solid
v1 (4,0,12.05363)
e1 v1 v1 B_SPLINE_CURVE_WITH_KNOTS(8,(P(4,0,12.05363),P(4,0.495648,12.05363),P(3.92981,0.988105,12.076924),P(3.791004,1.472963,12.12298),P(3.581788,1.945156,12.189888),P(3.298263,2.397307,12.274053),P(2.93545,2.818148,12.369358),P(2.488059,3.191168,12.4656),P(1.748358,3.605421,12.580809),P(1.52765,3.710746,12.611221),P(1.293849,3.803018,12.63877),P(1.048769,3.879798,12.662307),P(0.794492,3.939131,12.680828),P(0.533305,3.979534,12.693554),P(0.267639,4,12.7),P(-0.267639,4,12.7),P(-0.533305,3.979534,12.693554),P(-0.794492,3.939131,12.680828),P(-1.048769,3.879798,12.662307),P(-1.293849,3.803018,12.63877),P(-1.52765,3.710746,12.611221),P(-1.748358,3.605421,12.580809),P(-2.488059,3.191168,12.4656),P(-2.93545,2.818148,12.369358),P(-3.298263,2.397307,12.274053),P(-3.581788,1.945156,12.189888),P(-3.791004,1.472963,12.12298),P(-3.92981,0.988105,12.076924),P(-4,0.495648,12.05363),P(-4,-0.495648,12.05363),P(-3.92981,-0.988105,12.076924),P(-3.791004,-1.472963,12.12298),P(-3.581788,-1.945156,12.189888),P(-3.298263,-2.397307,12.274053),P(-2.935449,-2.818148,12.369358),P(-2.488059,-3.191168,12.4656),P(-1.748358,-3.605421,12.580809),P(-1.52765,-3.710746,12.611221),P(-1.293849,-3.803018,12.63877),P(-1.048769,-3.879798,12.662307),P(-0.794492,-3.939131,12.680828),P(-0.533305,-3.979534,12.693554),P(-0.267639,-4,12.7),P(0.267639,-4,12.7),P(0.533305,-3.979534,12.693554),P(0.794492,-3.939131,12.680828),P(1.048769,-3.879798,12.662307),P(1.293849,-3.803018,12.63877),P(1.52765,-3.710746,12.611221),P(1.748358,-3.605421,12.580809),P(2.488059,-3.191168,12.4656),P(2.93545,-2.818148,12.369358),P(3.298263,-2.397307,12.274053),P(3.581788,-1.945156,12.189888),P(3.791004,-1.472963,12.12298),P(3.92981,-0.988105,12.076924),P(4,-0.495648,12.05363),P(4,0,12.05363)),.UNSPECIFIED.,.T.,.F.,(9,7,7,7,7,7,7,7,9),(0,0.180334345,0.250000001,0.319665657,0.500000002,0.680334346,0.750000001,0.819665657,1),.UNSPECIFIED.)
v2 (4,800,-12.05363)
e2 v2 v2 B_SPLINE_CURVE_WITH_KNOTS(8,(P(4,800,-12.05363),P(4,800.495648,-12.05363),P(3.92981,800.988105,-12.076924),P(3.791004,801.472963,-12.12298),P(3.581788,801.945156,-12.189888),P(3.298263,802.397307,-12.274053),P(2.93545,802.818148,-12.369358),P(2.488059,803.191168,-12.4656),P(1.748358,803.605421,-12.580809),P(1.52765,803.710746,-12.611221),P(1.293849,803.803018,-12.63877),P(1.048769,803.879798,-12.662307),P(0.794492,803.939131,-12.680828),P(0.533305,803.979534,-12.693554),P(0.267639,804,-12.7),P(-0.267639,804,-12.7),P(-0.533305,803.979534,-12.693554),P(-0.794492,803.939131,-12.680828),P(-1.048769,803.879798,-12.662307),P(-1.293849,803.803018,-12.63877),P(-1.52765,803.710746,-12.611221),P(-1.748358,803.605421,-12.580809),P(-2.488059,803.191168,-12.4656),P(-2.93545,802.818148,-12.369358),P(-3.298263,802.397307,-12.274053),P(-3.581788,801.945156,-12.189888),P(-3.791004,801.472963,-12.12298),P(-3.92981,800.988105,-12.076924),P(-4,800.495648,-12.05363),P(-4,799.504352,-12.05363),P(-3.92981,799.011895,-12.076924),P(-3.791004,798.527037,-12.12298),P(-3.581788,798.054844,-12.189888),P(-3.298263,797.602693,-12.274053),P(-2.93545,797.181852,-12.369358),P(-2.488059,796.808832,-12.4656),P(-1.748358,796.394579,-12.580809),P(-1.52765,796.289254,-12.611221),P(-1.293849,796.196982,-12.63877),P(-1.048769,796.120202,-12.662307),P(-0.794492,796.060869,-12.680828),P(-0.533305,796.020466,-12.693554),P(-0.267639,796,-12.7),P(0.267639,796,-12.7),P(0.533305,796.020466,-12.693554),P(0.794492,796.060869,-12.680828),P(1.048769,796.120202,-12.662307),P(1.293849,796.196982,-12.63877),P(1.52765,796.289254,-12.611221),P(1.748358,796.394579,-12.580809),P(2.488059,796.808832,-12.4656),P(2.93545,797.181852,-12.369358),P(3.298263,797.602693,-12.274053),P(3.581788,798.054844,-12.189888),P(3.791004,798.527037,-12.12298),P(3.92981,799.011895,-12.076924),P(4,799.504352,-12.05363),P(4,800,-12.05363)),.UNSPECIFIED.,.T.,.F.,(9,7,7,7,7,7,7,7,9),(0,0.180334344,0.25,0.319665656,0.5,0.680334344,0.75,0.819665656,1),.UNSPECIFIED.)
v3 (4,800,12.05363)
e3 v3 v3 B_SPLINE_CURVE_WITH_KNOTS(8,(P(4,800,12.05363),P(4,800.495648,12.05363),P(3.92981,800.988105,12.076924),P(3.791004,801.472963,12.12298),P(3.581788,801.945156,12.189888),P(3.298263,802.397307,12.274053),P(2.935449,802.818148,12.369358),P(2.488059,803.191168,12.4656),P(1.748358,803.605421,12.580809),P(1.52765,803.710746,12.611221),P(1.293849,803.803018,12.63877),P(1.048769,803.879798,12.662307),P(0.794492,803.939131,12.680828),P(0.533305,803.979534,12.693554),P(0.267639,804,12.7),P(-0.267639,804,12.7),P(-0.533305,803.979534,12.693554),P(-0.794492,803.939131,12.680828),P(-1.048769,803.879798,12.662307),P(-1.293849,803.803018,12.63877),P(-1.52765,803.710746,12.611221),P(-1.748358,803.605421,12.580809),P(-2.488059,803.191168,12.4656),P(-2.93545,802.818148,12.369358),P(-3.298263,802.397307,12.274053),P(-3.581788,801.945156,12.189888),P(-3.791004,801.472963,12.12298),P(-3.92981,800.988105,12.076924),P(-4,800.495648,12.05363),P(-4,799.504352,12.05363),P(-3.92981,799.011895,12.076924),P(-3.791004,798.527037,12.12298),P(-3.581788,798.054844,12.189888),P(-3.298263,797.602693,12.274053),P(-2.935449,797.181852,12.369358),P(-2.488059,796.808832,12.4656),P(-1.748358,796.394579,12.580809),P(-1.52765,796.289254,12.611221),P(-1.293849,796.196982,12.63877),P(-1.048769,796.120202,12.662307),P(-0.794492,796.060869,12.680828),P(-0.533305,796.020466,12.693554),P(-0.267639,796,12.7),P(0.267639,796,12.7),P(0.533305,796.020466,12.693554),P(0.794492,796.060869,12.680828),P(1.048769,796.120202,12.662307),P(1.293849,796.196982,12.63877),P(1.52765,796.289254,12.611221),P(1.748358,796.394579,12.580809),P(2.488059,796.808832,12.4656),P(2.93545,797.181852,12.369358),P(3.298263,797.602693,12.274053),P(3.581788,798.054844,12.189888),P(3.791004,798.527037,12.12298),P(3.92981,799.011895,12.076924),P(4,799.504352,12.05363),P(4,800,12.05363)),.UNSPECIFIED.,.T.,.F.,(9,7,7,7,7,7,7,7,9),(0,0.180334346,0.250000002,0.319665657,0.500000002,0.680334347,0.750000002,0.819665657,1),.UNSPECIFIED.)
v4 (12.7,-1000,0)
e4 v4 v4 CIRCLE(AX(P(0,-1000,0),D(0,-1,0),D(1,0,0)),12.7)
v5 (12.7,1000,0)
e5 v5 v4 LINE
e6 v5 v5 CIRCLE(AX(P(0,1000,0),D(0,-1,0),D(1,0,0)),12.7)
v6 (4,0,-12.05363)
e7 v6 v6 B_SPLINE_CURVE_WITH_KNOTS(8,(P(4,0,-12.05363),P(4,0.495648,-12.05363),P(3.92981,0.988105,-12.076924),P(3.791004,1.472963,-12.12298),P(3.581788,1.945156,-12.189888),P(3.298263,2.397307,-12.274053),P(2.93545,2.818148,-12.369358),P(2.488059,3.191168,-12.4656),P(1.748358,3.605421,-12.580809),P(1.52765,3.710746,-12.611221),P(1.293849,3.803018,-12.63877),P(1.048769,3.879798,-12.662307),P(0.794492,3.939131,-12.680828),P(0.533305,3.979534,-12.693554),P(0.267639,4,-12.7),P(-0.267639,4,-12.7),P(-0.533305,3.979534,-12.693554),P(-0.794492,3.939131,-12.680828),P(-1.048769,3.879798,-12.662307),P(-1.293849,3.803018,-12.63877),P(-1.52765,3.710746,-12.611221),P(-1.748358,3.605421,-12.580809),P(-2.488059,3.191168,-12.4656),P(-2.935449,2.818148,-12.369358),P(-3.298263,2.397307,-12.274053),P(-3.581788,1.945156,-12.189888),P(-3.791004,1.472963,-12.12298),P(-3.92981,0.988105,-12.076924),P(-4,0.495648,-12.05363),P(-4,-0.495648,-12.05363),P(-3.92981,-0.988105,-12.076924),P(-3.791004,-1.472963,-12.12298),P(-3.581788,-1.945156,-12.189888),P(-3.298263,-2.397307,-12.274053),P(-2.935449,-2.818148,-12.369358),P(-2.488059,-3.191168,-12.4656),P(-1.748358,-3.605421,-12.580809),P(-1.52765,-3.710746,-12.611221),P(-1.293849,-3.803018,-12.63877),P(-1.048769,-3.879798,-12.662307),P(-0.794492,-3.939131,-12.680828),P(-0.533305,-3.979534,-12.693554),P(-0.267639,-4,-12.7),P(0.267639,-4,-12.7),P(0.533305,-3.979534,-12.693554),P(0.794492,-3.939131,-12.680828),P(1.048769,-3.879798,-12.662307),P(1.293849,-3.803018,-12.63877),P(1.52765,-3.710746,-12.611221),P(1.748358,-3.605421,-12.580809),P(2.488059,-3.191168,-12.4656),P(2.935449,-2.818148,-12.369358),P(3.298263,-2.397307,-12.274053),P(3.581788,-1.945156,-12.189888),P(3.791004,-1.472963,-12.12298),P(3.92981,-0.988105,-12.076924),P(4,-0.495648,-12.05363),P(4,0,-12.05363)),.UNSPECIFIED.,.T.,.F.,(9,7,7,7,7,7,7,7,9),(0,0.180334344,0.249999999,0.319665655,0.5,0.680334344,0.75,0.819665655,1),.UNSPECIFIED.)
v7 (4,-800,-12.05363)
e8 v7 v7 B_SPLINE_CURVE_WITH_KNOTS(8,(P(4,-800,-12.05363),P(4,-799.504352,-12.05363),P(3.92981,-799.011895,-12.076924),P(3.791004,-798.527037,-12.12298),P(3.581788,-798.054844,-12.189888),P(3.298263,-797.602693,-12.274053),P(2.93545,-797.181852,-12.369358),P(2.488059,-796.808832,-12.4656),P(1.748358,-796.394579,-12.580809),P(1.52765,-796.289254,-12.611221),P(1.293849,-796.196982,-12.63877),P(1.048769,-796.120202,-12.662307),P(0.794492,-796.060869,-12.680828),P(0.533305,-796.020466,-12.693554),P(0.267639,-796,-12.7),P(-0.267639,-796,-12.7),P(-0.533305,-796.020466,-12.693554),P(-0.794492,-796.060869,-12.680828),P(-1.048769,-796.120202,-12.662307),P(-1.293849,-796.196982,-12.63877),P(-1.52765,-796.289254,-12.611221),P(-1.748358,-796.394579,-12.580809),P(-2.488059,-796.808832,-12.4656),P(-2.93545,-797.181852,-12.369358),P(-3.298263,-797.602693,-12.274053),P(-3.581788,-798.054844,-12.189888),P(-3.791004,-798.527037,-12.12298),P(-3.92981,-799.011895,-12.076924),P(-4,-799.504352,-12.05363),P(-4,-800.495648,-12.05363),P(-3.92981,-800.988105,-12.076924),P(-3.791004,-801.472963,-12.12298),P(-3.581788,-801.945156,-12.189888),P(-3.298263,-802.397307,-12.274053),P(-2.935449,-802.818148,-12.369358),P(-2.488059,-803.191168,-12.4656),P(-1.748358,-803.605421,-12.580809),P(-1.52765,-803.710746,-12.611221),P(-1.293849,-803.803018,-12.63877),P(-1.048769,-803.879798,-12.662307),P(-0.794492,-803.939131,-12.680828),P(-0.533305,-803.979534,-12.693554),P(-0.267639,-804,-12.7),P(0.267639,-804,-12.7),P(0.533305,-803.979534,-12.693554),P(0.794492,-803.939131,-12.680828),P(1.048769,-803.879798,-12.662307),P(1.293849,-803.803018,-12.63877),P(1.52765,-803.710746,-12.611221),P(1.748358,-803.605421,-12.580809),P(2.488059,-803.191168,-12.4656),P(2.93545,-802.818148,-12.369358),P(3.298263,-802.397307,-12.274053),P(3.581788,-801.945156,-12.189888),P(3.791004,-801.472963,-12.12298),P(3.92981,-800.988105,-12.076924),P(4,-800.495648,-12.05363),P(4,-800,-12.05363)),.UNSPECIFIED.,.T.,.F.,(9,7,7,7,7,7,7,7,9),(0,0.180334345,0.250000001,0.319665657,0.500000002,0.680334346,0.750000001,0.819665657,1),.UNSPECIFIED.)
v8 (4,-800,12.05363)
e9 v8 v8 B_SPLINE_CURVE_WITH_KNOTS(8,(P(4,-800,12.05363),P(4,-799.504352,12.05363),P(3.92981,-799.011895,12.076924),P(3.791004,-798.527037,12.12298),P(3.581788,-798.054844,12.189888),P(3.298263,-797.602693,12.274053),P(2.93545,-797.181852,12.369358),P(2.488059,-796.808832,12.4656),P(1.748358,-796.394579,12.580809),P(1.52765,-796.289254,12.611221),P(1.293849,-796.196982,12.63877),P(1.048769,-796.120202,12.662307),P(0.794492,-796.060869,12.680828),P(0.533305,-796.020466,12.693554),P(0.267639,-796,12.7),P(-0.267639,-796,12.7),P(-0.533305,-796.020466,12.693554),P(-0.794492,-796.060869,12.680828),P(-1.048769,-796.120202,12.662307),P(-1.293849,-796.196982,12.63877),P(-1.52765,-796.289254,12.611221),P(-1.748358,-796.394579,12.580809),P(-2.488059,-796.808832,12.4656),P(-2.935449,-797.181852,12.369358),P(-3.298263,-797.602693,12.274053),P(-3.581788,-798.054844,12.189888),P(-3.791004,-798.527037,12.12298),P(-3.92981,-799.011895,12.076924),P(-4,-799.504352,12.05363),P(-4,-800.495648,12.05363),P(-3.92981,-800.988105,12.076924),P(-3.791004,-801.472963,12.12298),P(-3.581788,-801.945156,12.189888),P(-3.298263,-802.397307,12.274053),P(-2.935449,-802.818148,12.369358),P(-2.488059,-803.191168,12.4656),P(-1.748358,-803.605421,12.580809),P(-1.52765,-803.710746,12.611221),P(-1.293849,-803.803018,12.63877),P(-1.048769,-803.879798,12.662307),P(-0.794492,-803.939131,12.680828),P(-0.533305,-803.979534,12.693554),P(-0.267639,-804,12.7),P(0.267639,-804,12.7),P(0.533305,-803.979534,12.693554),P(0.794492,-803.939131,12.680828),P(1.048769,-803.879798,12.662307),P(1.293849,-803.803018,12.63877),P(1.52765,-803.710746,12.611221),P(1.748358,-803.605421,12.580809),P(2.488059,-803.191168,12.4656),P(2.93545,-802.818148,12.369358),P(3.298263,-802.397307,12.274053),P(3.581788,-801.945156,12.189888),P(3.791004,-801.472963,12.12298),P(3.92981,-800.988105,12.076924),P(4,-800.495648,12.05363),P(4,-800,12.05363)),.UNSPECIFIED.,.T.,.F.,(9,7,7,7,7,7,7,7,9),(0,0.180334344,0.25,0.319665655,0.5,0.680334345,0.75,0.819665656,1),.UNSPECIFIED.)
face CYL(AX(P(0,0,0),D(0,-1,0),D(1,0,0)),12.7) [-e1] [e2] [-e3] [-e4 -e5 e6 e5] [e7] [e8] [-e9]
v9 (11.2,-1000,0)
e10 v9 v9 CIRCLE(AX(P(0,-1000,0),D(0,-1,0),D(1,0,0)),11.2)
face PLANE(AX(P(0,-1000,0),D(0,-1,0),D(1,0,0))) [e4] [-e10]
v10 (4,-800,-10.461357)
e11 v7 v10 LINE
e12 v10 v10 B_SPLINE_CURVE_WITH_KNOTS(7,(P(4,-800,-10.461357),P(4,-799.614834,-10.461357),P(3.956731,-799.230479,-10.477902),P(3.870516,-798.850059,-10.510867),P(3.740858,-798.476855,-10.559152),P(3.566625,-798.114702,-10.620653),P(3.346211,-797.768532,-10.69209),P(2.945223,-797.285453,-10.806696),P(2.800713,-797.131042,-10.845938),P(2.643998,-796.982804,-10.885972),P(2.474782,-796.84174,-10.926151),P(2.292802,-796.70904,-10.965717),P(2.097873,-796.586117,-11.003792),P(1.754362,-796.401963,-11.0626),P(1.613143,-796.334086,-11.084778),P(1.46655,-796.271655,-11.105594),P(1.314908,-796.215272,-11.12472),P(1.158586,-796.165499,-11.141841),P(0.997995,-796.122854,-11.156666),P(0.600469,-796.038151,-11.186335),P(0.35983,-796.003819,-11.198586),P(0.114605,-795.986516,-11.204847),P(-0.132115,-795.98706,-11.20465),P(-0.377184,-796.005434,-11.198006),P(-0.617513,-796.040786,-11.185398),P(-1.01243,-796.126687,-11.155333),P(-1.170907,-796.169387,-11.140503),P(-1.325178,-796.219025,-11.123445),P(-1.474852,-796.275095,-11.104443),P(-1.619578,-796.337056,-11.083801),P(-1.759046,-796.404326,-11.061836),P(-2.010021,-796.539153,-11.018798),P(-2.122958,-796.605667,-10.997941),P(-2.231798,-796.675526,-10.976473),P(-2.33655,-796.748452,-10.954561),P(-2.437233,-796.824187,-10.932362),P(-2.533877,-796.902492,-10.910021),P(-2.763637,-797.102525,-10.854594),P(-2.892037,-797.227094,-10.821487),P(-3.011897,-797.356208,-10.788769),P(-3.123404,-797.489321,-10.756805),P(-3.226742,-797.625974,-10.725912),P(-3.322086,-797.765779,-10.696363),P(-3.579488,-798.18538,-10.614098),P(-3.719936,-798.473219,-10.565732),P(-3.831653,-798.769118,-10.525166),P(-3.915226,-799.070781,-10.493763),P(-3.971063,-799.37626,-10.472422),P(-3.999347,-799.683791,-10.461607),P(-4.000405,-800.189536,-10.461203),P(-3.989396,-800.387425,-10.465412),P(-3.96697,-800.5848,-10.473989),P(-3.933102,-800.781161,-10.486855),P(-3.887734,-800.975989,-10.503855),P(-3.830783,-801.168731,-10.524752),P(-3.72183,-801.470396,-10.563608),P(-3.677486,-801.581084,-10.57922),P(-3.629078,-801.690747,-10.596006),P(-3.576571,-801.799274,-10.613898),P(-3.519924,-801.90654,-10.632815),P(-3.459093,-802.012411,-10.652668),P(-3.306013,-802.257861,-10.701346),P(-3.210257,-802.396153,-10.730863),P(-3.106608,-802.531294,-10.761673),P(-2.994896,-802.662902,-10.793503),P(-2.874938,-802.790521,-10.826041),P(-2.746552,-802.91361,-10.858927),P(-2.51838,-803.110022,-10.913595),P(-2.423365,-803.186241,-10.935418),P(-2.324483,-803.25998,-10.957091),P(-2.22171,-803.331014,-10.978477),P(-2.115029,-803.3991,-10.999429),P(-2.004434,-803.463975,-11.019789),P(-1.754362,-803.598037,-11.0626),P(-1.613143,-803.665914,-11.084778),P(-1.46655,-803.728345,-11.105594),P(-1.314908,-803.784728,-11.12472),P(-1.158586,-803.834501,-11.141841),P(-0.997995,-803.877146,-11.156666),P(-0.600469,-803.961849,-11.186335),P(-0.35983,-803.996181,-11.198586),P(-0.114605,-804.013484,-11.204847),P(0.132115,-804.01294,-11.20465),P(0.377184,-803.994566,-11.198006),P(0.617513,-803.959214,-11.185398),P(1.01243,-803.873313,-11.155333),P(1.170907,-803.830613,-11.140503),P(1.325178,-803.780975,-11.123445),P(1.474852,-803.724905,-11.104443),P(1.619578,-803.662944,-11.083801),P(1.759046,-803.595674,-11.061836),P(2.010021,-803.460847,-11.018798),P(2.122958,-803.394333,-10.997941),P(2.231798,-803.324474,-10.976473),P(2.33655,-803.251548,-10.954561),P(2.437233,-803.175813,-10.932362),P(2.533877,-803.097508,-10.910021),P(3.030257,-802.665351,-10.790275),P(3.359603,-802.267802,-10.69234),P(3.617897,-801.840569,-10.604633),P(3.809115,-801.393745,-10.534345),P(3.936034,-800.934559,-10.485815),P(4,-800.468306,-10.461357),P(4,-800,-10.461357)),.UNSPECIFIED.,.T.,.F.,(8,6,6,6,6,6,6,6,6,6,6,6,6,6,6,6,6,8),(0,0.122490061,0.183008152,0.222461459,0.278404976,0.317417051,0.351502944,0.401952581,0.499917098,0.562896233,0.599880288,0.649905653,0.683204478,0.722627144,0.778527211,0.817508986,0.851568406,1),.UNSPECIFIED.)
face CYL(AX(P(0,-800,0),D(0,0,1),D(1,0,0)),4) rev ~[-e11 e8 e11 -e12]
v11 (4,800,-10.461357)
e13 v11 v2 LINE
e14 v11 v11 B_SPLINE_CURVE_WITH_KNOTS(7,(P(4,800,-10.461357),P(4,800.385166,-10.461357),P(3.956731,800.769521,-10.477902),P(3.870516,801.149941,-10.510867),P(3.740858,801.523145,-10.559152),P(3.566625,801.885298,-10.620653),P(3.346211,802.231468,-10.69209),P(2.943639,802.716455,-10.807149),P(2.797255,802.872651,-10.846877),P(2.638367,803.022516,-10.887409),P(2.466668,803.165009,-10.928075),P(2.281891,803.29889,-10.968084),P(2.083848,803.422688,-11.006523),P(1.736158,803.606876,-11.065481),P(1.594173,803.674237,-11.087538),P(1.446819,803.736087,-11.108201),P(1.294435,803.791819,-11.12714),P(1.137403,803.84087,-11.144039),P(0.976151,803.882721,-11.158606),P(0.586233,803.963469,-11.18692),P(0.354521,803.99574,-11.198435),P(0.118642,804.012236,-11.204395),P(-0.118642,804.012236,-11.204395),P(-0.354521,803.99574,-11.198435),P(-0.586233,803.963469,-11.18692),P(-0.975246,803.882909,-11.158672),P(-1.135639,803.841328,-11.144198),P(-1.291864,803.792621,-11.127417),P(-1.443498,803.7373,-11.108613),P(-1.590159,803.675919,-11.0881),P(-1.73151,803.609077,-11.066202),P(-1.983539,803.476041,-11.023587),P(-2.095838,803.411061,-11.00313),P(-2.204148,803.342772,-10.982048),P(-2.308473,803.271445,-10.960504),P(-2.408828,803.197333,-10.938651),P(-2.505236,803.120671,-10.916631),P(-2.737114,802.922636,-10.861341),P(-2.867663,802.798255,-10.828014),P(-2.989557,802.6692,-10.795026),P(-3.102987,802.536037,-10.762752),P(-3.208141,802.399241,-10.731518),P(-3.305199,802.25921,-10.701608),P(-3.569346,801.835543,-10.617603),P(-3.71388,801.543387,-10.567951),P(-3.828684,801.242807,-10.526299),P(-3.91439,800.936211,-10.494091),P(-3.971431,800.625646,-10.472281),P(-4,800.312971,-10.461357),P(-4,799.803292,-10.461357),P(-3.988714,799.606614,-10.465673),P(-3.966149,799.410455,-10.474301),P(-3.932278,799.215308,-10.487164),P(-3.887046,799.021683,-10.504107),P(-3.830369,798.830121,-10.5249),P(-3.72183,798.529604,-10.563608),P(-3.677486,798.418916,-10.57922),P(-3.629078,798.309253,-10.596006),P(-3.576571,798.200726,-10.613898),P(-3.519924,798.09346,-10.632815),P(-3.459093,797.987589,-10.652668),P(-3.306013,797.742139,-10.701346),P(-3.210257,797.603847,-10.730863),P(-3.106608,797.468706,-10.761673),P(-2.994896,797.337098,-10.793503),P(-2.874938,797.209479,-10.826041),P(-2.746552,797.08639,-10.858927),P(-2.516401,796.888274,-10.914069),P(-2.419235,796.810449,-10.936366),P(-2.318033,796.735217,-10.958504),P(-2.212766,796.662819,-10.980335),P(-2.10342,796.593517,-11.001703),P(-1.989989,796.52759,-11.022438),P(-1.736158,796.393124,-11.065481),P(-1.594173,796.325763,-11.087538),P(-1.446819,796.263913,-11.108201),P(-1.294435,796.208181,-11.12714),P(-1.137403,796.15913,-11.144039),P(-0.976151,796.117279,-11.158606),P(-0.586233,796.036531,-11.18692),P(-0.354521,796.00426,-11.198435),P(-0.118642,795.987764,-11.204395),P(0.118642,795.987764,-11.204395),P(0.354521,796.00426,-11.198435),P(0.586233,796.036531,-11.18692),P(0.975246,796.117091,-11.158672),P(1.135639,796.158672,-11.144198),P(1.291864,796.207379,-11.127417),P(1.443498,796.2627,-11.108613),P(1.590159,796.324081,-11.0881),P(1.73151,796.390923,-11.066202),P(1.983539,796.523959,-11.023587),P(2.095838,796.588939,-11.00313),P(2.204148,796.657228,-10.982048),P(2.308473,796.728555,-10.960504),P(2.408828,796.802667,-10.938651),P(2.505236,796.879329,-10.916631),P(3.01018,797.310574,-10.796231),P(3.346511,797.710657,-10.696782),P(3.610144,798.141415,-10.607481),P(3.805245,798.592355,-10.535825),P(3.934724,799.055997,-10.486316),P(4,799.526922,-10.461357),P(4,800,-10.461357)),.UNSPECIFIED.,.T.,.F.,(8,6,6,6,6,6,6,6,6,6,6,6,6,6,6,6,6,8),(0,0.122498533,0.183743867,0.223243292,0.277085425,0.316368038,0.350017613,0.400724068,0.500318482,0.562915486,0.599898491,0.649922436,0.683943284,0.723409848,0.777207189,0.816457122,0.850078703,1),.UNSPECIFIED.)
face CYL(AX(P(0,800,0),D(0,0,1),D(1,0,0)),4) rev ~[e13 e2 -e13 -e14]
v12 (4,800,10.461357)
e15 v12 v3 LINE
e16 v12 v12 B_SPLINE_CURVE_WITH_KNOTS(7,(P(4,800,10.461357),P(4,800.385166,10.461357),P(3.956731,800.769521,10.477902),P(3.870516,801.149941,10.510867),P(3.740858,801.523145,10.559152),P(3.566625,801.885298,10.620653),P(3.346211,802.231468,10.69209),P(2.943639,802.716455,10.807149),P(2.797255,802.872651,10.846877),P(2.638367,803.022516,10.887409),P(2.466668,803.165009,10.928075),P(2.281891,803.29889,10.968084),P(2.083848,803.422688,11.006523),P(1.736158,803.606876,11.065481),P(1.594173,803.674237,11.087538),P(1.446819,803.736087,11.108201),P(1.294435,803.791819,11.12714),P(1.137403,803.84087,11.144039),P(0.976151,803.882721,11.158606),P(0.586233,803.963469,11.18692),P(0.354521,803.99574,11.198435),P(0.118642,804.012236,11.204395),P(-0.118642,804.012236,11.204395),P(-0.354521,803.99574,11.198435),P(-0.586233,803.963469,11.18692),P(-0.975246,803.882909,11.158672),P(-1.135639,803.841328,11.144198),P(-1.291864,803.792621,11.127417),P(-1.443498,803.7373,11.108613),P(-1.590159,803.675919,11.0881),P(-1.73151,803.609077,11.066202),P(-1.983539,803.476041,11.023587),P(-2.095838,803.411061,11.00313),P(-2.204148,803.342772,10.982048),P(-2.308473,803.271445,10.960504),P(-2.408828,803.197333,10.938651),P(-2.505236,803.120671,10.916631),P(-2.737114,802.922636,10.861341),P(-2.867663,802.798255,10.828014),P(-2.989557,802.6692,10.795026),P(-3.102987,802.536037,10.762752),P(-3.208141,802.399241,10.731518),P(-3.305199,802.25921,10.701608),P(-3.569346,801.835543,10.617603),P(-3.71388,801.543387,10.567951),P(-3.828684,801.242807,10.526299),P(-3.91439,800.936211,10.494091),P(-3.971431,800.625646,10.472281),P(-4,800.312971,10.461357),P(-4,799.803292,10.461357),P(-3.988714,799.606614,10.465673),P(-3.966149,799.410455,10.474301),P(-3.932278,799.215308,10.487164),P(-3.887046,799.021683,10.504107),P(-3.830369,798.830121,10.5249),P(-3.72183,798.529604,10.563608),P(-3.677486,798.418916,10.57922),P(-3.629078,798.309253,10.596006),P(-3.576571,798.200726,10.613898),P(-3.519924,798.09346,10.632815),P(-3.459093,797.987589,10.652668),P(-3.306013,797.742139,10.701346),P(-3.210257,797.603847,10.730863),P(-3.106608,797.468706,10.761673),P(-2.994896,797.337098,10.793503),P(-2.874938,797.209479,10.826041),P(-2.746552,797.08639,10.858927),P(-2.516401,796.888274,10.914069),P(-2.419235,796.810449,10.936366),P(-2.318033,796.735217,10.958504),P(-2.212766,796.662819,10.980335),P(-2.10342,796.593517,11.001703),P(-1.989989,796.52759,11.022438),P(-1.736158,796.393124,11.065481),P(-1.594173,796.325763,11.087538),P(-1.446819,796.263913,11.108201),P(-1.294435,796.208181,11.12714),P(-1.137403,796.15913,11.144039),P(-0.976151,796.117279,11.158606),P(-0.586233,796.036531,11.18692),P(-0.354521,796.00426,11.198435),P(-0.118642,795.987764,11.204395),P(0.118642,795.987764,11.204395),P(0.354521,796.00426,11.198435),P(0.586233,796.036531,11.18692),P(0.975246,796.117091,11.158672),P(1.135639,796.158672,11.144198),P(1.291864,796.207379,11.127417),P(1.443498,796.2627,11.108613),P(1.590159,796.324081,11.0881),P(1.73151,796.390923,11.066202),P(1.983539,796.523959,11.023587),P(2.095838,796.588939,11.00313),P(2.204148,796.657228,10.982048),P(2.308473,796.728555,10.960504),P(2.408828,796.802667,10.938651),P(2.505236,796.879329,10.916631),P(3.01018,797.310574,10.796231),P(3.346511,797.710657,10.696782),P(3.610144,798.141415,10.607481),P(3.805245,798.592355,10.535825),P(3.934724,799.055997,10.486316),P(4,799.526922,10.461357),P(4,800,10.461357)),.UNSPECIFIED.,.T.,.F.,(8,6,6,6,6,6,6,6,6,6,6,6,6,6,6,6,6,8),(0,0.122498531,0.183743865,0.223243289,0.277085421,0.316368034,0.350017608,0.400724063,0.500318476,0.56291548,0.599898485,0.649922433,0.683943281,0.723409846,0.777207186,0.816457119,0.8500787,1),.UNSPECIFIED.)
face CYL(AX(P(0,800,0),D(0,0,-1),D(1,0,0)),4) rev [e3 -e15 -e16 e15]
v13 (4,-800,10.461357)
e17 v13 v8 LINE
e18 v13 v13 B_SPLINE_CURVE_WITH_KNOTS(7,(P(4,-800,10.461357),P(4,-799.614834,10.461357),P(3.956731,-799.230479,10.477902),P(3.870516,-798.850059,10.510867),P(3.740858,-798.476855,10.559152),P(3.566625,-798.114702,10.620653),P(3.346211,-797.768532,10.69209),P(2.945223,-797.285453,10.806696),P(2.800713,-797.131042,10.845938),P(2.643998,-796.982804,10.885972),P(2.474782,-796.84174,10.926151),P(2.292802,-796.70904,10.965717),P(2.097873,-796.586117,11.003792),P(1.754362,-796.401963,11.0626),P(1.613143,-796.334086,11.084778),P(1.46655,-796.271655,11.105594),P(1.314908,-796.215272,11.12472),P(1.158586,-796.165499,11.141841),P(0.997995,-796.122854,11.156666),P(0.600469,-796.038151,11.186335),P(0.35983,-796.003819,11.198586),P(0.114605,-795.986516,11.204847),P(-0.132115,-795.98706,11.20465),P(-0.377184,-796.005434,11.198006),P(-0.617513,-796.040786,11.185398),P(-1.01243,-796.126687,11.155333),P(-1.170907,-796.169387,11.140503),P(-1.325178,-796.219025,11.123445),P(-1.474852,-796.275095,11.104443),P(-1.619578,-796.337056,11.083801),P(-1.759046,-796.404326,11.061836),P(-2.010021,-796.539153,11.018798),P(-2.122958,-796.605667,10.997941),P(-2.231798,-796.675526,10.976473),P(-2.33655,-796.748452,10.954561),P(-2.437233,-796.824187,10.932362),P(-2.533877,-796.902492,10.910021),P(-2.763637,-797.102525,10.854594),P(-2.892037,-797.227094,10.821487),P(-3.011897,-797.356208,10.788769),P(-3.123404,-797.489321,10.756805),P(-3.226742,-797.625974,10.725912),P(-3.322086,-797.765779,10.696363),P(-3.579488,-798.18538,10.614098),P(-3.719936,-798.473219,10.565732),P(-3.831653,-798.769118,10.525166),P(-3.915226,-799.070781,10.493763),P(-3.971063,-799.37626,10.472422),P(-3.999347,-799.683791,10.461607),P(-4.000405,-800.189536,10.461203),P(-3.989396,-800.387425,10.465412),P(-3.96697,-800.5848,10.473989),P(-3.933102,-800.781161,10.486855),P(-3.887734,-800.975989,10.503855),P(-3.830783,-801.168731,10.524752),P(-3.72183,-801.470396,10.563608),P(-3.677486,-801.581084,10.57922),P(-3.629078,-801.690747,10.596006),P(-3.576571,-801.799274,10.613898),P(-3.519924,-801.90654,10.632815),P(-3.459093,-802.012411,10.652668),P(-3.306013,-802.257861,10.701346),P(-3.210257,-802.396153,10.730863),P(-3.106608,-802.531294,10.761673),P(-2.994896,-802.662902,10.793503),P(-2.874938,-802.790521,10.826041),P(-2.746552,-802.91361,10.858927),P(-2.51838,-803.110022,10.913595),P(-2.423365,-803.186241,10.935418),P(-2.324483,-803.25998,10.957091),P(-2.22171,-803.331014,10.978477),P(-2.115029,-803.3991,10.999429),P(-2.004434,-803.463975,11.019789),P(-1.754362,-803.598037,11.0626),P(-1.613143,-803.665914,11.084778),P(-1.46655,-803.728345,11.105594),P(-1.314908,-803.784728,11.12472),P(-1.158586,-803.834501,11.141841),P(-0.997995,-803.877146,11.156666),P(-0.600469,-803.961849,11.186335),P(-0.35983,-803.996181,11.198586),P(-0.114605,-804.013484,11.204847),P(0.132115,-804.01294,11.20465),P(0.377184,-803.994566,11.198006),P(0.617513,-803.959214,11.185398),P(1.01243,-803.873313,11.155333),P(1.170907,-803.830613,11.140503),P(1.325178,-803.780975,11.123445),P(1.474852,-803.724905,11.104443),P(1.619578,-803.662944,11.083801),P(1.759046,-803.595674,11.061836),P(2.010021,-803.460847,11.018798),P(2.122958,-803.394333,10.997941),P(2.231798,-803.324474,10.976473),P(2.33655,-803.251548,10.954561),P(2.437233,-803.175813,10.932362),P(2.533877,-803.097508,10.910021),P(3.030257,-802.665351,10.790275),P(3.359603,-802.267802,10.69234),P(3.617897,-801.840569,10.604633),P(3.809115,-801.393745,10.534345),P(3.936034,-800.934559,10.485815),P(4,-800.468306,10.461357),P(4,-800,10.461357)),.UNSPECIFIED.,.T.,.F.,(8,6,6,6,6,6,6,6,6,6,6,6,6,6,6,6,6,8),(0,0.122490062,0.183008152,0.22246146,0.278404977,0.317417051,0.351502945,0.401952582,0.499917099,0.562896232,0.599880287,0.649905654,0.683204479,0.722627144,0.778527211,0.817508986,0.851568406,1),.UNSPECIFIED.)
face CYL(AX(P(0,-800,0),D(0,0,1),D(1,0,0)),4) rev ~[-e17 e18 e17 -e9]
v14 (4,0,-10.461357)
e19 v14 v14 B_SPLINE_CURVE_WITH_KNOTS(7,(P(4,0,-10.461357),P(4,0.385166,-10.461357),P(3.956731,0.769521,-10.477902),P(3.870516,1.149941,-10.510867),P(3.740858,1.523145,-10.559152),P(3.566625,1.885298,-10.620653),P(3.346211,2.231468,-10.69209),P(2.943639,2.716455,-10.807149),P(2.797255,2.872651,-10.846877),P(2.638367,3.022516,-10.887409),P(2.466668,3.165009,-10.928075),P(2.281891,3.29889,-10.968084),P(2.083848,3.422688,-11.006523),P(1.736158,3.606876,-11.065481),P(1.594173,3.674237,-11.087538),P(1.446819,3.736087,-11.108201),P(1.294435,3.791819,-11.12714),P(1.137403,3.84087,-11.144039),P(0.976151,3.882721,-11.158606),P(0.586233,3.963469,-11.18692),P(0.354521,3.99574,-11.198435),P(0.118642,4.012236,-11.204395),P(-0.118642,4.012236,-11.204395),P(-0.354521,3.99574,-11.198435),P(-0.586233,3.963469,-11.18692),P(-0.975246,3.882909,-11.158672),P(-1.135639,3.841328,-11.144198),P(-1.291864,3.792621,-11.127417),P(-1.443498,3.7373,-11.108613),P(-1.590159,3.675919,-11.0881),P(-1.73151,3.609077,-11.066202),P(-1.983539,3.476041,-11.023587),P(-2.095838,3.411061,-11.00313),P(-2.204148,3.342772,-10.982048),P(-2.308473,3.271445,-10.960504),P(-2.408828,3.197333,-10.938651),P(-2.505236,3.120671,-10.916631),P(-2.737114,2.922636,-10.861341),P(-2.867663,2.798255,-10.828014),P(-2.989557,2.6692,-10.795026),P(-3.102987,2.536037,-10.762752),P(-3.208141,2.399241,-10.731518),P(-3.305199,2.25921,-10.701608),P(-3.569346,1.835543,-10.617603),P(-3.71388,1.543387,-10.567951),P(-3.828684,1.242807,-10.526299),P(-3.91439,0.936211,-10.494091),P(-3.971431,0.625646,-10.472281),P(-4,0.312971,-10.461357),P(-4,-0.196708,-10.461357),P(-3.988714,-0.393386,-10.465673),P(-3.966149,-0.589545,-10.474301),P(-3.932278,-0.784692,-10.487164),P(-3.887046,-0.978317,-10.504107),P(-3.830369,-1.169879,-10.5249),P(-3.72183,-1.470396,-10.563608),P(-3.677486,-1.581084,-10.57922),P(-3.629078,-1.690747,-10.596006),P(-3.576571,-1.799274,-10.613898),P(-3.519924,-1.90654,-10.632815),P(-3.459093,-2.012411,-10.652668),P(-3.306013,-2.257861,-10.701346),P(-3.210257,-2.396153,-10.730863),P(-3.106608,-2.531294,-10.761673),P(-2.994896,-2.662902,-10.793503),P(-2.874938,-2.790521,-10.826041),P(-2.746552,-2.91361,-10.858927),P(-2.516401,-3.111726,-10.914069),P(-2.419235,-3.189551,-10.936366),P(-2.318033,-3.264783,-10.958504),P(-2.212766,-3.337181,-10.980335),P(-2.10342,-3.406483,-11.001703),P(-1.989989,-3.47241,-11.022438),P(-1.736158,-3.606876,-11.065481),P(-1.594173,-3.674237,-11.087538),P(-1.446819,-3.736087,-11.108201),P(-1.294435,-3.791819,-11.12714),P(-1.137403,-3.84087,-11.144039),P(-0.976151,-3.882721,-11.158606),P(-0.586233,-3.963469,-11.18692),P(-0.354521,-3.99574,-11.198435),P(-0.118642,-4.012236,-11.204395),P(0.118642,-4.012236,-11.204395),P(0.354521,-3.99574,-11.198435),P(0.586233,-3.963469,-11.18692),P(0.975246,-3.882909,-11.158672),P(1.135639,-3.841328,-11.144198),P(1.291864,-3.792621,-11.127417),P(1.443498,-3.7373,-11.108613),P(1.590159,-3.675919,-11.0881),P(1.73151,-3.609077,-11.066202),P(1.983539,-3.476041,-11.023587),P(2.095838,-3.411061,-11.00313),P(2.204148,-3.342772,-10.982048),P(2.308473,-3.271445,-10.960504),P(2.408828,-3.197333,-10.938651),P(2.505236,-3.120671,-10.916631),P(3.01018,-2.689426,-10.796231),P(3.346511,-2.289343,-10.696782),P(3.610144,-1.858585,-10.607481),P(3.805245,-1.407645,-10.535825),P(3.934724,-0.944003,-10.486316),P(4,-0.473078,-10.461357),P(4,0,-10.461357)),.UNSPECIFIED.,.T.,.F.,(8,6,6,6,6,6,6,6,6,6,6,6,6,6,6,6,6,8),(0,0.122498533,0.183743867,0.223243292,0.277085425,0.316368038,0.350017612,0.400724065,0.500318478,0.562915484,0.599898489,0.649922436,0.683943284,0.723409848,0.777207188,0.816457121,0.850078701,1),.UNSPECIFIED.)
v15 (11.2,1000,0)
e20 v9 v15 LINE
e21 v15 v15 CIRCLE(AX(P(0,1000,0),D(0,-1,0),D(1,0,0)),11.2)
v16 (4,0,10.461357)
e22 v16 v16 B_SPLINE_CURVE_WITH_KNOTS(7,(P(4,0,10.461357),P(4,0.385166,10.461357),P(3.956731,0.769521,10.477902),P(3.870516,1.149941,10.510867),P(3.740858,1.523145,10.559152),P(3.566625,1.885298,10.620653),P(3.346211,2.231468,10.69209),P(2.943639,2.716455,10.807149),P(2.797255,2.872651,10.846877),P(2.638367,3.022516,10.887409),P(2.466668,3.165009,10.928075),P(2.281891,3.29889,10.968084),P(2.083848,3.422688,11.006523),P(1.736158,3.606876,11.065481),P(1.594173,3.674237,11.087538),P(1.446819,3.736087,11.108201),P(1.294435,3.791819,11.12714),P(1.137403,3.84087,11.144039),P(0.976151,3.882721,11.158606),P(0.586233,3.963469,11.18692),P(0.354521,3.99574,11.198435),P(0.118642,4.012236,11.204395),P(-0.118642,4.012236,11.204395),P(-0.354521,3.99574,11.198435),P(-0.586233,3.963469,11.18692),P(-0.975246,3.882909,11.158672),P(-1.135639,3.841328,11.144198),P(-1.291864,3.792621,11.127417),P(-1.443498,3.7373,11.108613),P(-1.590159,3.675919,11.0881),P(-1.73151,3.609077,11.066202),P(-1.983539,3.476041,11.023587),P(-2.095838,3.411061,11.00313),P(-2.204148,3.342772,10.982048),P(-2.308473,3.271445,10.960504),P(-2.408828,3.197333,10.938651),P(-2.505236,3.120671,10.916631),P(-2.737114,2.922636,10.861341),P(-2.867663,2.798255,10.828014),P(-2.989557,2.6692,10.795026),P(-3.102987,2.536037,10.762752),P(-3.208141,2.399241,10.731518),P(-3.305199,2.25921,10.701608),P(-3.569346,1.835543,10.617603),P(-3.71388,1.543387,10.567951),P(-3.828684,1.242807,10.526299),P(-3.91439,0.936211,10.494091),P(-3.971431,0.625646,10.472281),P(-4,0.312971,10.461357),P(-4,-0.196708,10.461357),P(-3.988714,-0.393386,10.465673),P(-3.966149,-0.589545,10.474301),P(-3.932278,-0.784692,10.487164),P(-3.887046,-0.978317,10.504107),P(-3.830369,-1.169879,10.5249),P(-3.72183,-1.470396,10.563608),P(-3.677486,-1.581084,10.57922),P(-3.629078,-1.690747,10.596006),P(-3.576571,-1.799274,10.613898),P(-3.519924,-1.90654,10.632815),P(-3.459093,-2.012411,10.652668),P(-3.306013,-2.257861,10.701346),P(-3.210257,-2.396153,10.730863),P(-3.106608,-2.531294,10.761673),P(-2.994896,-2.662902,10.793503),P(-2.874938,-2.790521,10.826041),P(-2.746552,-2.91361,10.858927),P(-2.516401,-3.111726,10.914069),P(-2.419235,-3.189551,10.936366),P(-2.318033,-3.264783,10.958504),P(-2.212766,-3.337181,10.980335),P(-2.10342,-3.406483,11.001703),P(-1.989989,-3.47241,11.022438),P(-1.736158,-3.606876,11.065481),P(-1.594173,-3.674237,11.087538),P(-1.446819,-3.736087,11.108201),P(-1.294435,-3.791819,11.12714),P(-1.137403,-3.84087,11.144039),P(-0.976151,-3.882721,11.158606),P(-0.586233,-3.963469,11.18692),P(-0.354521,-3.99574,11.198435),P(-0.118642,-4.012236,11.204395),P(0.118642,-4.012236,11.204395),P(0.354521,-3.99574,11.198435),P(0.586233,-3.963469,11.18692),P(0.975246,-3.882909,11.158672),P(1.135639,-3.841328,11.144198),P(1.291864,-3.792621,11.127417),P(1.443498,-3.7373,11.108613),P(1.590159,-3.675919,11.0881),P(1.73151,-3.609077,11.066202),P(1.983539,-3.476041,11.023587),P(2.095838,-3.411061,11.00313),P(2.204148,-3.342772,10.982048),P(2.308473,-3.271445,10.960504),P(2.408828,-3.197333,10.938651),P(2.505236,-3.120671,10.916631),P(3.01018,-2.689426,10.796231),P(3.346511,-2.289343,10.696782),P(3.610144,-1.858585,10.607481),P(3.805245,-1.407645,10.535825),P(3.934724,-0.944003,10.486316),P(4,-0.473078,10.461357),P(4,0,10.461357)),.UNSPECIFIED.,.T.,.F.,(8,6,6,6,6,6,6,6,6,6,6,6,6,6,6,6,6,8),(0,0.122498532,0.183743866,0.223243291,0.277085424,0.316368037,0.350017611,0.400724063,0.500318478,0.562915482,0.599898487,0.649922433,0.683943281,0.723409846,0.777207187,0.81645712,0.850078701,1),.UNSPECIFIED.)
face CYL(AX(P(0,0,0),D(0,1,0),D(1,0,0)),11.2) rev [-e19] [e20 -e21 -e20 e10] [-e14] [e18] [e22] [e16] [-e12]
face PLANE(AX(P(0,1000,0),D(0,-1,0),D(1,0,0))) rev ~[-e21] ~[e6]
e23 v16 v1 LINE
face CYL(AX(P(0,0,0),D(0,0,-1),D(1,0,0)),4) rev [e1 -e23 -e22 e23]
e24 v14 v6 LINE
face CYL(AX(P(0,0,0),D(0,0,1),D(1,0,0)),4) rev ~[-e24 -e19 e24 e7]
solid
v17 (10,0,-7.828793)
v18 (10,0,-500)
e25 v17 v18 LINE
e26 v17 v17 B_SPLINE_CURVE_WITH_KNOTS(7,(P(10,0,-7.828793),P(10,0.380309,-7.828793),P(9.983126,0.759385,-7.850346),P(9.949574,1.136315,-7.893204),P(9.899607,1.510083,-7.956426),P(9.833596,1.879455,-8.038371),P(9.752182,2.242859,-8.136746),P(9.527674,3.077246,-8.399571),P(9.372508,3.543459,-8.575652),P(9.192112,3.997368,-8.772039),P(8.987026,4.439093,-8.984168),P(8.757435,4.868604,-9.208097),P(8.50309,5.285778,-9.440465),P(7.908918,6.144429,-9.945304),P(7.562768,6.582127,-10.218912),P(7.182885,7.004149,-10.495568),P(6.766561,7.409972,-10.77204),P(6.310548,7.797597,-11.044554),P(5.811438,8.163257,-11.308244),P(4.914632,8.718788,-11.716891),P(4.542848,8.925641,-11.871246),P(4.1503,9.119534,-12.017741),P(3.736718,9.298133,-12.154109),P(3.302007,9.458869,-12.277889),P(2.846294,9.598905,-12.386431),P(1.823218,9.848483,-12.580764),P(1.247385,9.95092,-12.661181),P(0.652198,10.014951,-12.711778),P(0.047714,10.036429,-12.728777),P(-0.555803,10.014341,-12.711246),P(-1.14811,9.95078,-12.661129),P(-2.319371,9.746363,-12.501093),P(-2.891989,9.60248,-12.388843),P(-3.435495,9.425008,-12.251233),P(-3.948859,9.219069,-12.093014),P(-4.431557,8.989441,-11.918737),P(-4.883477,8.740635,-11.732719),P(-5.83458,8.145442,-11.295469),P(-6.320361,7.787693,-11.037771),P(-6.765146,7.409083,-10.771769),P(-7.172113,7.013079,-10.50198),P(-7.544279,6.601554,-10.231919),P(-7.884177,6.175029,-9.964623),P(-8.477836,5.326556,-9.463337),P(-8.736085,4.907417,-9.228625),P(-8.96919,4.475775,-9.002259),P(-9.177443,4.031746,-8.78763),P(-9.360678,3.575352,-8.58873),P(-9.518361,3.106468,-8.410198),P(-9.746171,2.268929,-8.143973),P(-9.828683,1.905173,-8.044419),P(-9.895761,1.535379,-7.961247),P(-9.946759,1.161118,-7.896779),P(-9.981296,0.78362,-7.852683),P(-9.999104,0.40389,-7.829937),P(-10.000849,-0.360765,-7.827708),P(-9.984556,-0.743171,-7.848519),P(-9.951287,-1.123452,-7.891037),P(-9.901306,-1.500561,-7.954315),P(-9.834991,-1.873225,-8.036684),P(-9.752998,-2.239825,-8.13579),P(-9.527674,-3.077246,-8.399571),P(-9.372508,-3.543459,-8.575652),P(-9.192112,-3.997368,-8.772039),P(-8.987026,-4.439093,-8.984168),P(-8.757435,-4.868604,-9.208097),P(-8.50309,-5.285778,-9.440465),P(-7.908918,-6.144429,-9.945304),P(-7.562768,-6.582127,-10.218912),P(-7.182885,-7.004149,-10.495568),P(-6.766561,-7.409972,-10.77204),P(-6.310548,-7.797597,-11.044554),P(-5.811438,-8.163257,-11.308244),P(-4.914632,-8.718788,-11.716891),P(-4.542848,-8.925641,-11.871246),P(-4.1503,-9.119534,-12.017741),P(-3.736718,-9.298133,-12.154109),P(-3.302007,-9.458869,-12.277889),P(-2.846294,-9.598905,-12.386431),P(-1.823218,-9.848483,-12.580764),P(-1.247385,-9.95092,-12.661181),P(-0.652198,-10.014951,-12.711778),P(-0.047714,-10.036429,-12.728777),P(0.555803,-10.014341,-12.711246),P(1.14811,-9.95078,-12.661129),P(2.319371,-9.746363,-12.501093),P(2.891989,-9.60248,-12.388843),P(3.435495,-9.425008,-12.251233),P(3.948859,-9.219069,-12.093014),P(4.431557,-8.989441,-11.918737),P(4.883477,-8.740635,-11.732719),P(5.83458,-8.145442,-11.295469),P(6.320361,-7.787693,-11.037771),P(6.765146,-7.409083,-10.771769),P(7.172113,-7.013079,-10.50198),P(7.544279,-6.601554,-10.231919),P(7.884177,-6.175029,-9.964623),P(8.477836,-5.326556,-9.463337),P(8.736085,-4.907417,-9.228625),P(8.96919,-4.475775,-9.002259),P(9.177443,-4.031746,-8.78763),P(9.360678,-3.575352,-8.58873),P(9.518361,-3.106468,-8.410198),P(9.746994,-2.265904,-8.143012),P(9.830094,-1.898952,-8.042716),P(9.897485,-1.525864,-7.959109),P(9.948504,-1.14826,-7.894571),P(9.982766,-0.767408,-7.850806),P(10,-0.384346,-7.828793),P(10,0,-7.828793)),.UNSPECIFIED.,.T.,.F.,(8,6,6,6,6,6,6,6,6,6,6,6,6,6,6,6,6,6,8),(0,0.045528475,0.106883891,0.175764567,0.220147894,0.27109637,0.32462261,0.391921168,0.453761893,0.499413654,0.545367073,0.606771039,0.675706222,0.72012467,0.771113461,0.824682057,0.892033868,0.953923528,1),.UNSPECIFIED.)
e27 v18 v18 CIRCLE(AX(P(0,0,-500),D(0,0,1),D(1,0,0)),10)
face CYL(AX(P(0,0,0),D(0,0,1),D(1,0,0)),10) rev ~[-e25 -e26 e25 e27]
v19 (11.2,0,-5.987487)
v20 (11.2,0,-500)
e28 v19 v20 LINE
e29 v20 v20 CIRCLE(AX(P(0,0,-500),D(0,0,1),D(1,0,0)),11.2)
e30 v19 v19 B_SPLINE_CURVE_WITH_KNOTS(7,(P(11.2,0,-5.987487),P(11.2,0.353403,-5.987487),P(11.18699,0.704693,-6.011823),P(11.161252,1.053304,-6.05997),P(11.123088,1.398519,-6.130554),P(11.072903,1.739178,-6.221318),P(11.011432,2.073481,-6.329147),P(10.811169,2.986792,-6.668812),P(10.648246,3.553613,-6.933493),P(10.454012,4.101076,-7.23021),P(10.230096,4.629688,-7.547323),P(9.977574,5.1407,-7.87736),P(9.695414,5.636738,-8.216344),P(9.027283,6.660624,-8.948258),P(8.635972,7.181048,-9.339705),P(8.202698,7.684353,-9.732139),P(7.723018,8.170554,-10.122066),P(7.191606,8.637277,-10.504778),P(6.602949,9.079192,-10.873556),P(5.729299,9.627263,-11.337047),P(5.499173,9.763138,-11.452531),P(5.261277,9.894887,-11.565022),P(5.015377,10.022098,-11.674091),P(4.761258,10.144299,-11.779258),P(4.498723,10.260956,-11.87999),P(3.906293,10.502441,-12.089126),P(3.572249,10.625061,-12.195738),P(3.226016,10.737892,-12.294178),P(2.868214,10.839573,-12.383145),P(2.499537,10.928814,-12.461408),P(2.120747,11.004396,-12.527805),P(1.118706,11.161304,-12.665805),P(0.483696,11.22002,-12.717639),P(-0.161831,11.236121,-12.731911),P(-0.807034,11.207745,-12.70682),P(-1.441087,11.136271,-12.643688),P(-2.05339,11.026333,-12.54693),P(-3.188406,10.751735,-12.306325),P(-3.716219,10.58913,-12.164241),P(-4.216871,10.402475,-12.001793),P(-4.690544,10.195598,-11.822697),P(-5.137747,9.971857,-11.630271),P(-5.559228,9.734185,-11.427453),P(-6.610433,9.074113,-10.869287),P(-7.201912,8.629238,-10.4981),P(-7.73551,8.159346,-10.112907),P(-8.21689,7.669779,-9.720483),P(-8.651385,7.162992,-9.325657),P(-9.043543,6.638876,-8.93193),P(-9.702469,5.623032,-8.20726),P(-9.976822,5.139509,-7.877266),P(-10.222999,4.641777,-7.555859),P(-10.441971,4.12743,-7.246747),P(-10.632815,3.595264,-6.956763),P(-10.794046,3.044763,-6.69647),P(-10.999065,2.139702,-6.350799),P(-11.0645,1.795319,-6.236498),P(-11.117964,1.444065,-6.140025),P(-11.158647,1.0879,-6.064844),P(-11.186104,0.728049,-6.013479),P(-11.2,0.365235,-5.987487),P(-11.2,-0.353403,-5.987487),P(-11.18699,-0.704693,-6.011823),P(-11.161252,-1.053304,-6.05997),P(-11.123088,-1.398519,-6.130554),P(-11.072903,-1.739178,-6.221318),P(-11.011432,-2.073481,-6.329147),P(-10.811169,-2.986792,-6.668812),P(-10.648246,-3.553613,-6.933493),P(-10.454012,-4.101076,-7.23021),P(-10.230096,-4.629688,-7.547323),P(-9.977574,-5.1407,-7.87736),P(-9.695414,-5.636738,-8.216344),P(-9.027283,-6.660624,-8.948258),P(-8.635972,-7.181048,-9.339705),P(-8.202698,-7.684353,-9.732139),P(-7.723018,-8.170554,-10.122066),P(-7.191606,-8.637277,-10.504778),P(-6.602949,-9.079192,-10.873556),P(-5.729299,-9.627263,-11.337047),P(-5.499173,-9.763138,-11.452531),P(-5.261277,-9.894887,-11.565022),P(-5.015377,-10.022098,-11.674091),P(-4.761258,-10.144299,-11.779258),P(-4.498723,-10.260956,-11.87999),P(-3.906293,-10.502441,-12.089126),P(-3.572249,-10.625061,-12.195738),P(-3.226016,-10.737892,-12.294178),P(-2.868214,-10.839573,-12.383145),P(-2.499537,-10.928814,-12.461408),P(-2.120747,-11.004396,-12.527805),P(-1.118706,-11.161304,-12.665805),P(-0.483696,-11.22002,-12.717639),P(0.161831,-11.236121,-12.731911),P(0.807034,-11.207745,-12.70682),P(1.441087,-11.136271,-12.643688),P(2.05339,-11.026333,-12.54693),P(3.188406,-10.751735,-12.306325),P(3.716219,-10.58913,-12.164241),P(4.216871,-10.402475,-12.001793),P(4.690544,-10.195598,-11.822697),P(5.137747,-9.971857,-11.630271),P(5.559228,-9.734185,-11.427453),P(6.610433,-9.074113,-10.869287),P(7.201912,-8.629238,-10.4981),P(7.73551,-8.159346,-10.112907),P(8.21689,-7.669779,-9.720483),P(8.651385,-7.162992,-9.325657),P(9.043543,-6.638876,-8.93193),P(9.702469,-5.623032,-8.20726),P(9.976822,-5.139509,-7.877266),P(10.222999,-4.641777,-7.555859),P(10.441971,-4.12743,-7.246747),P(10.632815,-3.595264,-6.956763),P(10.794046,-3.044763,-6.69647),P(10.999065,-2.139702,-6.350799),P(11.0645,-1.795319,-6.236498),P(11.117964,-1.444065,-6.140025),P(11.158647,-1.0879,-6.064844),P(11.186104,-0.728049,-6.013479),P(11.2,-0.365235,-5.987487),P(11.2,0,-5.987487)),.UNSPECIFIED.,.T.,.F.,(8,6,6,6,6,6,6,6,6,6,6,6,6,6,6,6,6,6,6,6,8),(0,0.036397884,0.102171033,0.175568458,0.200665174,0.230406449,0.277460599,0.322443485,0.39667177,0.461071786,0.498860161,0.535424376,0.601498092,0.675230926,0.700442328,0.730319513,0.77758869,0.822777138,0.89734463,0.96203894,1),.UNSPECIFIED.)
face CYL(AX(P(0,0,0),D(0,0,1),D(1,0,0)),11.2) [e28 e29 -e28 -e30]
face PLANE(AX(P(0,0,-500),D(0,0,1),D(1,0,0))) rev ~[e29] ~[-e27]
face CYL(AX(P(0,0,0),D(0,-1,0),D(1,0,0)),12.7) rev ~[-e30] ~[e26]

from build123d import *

# Parameters (mm, degrees)
F0_R     = 12.7
F0_R_2   = 11.2
F1_DEPTH = 1000
F2_R     = 11.2
F2_R_2   = 10
F3_DEPTH = 500
F4_R     = 12.7
F5_DEPTH = 12.5
F6_R     = 4
F7_DEPTH = 15


with BuildPart() as f1:
    # F0 (on Front) → F1 (new body, symmetric)
    with BuildSketch(Plane.XZ):
        Circle(F0_R)
        Circle(F0_R_2, mode=Mode.SUBTRACT)
    extrude(amount=F1_DEPTH, both=True)

    # F6 (on Top) → F7 (cut, symmetric)
    with BuildSketch(Plane.XY):
        Circle(F6_R)
        with Locations((0, 800)):
            Circle(F6_R)
        with Locations((0, -800)):
            Circle(F6_R)
    extrude(amount=F7_DEPTH, both=True, mode=Mode.SUBTRACT)


with BuildPart() as f3:
    # F2 (on Top) → F3 (new body)
    with BuildSketch(Plane.XY):
        Circle(F2_R)
        Circle(F2_R_2, mode=Mode.SUBTRACT)
    extrude(amount=-F3_DEPTH)

    # F4 (on Front) → F5 (cut, symmetric)
    with BuildSketch(Plane.XZ):
        Circle(F4_R)
    extrude(amount=F5_DEPTH, both=True, mode=Mode.SUBTRACT)


solid = Compound([f1.part, f3.part])
